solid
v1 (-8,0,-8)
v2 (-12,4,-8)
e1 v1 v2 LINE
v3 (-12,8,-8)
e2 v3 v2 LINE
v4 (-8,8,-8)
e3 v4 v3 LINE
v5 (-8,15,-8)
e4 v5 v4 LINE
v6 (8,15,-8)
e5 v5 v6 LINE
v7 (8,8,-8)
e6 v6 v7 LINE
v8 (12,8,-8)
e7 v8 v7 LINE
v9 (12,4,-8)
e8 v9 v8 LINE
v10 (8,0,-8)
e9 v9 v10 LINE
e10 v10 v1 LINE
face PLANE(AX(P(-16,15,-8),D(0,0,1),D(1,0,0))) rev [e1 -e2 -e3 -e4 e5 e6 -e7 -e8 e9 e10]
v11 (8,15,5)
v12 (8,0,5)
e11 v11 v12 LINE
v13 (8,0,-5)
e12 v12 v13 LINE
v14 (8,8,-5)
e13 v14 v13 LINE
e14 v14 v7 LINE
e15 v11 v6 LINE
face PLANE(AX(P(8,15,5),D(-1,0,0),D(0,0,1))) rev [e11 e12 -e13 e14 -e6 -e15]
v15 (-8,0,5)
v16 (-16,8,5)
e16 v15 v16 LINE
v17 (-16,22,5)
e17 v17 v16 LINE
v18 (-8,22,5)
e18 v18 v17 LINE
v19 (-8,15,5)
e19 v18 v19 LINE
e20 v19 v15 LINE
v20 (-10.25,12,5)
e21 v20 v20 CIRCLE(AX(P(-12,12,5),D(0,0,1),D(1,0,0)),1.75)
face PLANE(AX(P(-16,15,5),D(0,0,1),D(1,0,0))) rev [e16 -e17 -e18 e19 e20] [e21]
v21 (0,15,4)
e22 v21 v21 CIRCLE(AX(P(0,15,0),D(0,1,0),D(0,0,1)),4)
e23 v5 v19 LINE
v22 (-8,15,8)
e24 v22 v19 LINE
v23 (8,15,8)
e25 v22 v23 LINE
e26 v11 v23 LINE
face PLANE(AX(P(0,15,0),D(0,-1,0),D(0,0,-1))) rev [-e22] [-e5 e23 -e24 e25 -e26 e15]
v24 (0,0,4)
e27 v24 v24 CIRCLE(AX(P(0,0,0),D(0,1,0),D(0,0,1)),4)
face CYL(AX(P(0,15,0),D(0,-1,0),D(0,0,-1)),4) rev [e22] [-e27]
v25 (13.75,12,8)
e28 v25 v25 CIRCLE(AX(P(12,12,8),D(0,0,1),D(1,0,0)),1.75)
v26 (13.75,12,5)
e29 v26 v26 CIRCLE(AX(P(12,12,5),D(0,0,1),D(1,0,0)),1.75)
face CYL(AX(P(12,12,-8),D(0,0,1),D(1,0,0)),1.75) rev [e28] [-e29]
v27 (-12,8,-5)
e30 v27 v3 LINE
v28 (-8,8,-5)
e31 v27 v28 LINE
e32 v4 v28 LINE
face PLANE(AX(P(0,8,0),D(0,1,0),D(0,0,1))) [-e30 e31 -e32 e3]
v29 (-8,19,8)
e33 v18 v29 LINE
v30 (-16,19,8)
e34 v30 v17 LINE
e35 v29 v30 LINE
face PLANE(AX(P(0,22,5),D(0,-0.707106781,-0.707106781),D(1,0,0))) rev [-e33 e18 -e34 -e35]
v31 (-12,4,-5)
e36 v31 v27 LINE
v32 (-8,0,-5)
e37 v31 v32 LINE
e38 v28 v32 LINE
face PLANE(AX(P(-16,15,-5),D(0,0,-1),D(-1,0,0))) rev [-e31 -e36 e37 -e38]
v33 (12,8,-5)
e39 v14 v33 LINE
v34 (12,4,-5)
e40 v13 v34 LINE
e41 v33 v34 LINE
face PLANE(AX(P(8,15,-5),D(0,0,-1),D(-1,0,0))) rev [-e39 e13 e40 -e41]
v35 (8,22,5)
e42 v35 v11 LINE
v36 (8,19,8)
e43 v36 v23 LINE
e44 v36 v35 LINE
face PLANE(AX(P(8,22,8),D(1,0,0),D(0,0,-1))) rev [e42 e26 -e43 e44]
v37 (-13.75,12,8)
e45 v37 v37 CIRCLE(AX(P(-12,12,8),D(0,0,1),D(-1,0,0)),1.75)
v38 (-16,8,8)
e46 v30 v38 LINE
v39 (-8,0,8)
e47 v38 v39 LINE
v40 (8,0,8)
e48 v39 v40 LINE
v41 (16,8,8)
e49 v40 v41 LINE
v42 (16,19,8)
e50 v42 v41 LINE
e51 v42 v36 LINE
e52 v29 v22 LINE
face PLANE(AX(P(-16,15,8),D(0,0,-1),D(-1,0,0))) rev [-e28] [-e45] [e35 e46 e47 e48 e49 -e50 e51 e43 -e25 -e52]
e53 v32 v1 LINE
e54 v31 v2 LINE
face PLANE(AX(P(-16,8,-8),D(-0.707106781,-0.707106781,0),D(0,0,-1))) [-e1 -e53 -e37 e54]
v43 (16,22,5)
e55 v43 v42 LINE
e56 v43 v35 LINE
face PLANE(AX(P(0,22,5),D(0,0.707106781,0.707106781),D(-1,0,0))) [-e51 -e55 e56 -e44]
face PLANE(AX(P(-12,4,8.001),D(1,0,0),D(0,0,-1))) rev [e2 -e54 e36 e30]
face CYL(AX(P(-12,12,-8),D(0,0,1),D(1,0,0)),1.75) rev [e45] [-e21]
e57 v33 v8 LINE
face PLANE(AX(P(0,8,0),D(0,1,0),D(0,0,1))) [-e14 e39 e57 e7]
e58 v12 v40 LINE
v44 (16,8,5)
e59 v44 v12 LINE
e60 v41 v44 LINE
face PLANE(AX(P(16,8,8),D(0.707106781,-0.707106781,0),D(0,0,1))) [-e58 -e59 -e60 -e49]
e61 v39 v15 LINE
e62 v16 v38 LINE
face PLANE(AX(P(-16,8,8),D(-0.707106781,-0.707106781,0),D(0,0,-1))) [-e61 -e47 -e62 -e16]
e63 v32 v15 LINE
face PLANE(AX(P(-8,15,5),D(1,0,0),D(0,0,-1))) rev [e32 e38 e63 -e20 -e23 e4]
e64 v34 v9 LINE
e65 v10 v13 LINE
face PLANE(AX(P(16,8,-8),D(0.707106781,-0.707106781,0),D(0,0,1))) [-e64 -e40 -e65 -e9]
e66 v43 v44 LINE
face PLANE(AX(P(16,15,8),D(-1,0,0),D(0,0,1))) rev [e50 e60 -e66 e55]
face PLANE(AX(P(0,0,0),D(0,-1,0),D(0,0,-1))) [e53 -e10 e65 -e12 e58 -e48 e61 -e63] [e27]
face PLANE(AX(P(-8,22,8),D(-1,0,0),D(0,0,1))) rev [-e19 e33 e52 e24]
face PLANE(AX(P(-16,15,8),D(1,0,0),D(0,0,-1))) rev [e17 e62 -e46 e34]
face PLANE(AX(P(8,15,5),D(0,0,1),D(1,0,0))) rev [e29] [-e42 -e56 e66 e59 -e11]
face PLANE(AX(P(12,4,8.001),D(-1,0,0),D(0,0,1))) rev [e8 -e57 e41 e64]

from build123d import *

# Parameters (mm, degrees)
SKETCH1_R                      = 4
BOSS_EXTRUDE1_DEPTH            = 15
CHAMFER1_SIZE                  = 8
SKETCH2_W                      = 8
SKETCH2_H                      = 3
BOSS_EXTRUDE2_DEPTH            = 7
CHAMFER3_SIZE                  = 3
SKETCH4_W                      = 32
SKETCH4_H                      = 3
CUT_EXTRUDE2_DEPTH             = 7
CUT_EXTRUDE2_DIRECTION_2_REACH = 25.345
CUT_EXTRUDE3_REACH             = 33.559
SKETCH6_R                      = 1.75
CUT_EXTRUDE4_DEPTH             = 32.559467676
SKETCH7_W                      = 16
SKETCH7_H                      = 3
BOSS_EXTRUDE3_DEPTH            = 7


with BuildPart() as part:
    # Sketch1 → Boss-Extrude1 (new body)
    with BuildSketch(Plane(origin=(0, 0, 0), x_dir=(1, 0, 0), z_dir=(0, 1, 0))):
        Polygon((-8, -5), (-8, 5), (-16, 5), (-16, 8), (16, 8), (16, 5), (8, 5), (8, -5), (16, -5), (16, -8), (-16, -8), (-16, -5), align=None)
        with Locations(Location((0, 0, 0), (0, 0, 270))):
            Circle(SKETCH1_R, mode=Mode.SUBTRACT)
    extrude(amount=BOSS_EXTRUDE1_DEPTH)

    # Chamfer1
    chamfer1_edges = [part.edges().sort_by_distance(p)[0] for p in [
        (16, 0, 6.5),
        (-16, 0, 6.5),
        (-16, 0, -6.5),
        (16, 0, -6.5),
    ]]
    chamfer(chamfer1_edges, length=CHAMFER1_SIZE)

    # Sketch2 → Boss-Extrude2 (add)
    with BuildSketch(Plane(origin=(0, 15, 0), x_dir=(1, 0, 0), z_dir=(0, 1, 0))):
        with Locations((12, -6.5)):
            Rectangle(SKETCH2_W, SKETCH2_H)
        with Locations((12, 6.5)):
            Rectangle(SKETCH2_W, SKETCH2_H)
        with Locations((-12, -6.5)):
            Rectangle(SKETCH2_W, SKETCH2_H)
        with Locations((-12, 6.5)):
            Rectangle(SKETCH2_W, SKETCH2_H)
    extrude(amount=BOSS_EXTRUDE2_DEPTH)

    # Chamfer3
    chamfer3_edges = [part.edges().sort_by_distance(p)[0] for p in [
        (-12, 22, 8),
        (12, 22, 8),
        (-12, 22, -8),
        (12, 22, -8),
    ]]
    chamfer(chamfer3_edges, length=CHAMFER3_SIZE - 0.0001)  # a hair under: the kernel refuses the full size

    # Sketch4 → Cut-Extrude2 (cut)
    with BuildSketch(Plane(origin=(0, 15, 0), x_dir=(1, 0, 0), z_dir=(0, 1, 0))):
        with Locations((0, 6.5)):
            Rectangle(SKETCH4_W, SKETCH4_H)
    extrude(amount=-CUT_EXTRUDE2_DEPTH, mode=Mode.SUBTRACT)

    # Sketch4 → Cut-Extrude2 direction 2 (cut, up to next)
    with BuildSketch(Plane(origin=(0, 15, 0), x_dir=(1, 0, 0), z_dir=(0, 1, 0)), mode=Mode.PRIVATE) as cut_extrude2_direction_2_sk1:
        with Locations((0, 6.5)):
            Rectangle(SKETCH4_W, SKETCH4_H)
    cut_extrude2_direction_2_tool1 = extrude(cut_extrude2_direction_2_sk1.sketch, amount=CUT_EXTRUDE2_DIRECTION_2_REACH, mode=Mode.PRIVATE) & part.part
    add(cut_extrude2_direction_2_tool1.solids().sort_by_distance((0, 15, -6.5))[0], mode=Mode.SUBTRACT)


with BuildPart() as cut_extrude2_kept_piece:
    # of the separate pieces the step leaves, the one the design keeps (cut_extrude2_pieces_kept)
    add(part.part.solids().sort_by_distance((-16, 8, -5))[0])

    # Sketch5 → Cut-Extrude3 (cut, up to next)
    with BuildSketch(Plane(origin=(0, 0, -8), x_dir=(-1, 0, 0), z_dir=(0, 0, -1)), mode=Mode.PRIVATE) as cut_extrude3_sk1:
        Polygon((-12, 4), (-12, 8), (-16, 8), align=None)
    cut_extrude3_tool1 = extrude(cut_extrude3_sk1.sketch, amount=-CUT_EXTRUDE3_REACH, mode=Mode.PRIVATE) & cut_extrude2_kept_piece.part
    # Sketch5 → Cut-Extrude3 (cut, up to next)
    with BuildSketch(Plane(origin=(0, 0, -8), x_dir=(-1, 0, 0), z_dir=(0, 0, -1)), mode=Mode.PRIVATE) as cut_extrude3_sk2:
        Polygon((16, 8), (12, 4), (12, 8), align=None)
    cut_extrude3_tool2 = extrude(cut_extrude3_sk2.sketch, amount=-CUT_EXTRUDE3_REACH, mode=Mode.PRIVATE) & cut_extrude2_kept_piece.part
    add(cut_extrude3_tool1.solids().sort_by_distance((13.333333, 6.666667, -8))[0], mode=Mode.SUBTRACT)
    add(cut_extrude3_tool2.solids().sort_by_distance((-13.333333, 6.666667, -8))[0], mode=Mode.SUBTRACT)

    # Sketch6 → Cut-Extrude4 (cut, through all)
    with BuildSketch(Plane.XY.offset(8)):
        with Locations((12, 12)):
            Circle(SKETCH6_R)
        with Locations((-12, 12)):
            Circle(SKETCH6_R)
    extrude(amount=-CUT_EXTRUDE4_DEPTH, mode=Mode.SUBTRACT)

    # Sketch7 → Boss-Extrude3 (add)
    with BuildSketch(Plane(origin=(0, 8, 0), x_dir=(1, 0, 0), z_dir=(0, 1, 0))):
        with Locations((0, 6.5)):
            Rectangle(SKETCH7_W, SKETCH7_H)
    extrude(amount=BOSS_EXTRUDE3_DEPTH)


solid = cut_extrude2_kept_piece.part
